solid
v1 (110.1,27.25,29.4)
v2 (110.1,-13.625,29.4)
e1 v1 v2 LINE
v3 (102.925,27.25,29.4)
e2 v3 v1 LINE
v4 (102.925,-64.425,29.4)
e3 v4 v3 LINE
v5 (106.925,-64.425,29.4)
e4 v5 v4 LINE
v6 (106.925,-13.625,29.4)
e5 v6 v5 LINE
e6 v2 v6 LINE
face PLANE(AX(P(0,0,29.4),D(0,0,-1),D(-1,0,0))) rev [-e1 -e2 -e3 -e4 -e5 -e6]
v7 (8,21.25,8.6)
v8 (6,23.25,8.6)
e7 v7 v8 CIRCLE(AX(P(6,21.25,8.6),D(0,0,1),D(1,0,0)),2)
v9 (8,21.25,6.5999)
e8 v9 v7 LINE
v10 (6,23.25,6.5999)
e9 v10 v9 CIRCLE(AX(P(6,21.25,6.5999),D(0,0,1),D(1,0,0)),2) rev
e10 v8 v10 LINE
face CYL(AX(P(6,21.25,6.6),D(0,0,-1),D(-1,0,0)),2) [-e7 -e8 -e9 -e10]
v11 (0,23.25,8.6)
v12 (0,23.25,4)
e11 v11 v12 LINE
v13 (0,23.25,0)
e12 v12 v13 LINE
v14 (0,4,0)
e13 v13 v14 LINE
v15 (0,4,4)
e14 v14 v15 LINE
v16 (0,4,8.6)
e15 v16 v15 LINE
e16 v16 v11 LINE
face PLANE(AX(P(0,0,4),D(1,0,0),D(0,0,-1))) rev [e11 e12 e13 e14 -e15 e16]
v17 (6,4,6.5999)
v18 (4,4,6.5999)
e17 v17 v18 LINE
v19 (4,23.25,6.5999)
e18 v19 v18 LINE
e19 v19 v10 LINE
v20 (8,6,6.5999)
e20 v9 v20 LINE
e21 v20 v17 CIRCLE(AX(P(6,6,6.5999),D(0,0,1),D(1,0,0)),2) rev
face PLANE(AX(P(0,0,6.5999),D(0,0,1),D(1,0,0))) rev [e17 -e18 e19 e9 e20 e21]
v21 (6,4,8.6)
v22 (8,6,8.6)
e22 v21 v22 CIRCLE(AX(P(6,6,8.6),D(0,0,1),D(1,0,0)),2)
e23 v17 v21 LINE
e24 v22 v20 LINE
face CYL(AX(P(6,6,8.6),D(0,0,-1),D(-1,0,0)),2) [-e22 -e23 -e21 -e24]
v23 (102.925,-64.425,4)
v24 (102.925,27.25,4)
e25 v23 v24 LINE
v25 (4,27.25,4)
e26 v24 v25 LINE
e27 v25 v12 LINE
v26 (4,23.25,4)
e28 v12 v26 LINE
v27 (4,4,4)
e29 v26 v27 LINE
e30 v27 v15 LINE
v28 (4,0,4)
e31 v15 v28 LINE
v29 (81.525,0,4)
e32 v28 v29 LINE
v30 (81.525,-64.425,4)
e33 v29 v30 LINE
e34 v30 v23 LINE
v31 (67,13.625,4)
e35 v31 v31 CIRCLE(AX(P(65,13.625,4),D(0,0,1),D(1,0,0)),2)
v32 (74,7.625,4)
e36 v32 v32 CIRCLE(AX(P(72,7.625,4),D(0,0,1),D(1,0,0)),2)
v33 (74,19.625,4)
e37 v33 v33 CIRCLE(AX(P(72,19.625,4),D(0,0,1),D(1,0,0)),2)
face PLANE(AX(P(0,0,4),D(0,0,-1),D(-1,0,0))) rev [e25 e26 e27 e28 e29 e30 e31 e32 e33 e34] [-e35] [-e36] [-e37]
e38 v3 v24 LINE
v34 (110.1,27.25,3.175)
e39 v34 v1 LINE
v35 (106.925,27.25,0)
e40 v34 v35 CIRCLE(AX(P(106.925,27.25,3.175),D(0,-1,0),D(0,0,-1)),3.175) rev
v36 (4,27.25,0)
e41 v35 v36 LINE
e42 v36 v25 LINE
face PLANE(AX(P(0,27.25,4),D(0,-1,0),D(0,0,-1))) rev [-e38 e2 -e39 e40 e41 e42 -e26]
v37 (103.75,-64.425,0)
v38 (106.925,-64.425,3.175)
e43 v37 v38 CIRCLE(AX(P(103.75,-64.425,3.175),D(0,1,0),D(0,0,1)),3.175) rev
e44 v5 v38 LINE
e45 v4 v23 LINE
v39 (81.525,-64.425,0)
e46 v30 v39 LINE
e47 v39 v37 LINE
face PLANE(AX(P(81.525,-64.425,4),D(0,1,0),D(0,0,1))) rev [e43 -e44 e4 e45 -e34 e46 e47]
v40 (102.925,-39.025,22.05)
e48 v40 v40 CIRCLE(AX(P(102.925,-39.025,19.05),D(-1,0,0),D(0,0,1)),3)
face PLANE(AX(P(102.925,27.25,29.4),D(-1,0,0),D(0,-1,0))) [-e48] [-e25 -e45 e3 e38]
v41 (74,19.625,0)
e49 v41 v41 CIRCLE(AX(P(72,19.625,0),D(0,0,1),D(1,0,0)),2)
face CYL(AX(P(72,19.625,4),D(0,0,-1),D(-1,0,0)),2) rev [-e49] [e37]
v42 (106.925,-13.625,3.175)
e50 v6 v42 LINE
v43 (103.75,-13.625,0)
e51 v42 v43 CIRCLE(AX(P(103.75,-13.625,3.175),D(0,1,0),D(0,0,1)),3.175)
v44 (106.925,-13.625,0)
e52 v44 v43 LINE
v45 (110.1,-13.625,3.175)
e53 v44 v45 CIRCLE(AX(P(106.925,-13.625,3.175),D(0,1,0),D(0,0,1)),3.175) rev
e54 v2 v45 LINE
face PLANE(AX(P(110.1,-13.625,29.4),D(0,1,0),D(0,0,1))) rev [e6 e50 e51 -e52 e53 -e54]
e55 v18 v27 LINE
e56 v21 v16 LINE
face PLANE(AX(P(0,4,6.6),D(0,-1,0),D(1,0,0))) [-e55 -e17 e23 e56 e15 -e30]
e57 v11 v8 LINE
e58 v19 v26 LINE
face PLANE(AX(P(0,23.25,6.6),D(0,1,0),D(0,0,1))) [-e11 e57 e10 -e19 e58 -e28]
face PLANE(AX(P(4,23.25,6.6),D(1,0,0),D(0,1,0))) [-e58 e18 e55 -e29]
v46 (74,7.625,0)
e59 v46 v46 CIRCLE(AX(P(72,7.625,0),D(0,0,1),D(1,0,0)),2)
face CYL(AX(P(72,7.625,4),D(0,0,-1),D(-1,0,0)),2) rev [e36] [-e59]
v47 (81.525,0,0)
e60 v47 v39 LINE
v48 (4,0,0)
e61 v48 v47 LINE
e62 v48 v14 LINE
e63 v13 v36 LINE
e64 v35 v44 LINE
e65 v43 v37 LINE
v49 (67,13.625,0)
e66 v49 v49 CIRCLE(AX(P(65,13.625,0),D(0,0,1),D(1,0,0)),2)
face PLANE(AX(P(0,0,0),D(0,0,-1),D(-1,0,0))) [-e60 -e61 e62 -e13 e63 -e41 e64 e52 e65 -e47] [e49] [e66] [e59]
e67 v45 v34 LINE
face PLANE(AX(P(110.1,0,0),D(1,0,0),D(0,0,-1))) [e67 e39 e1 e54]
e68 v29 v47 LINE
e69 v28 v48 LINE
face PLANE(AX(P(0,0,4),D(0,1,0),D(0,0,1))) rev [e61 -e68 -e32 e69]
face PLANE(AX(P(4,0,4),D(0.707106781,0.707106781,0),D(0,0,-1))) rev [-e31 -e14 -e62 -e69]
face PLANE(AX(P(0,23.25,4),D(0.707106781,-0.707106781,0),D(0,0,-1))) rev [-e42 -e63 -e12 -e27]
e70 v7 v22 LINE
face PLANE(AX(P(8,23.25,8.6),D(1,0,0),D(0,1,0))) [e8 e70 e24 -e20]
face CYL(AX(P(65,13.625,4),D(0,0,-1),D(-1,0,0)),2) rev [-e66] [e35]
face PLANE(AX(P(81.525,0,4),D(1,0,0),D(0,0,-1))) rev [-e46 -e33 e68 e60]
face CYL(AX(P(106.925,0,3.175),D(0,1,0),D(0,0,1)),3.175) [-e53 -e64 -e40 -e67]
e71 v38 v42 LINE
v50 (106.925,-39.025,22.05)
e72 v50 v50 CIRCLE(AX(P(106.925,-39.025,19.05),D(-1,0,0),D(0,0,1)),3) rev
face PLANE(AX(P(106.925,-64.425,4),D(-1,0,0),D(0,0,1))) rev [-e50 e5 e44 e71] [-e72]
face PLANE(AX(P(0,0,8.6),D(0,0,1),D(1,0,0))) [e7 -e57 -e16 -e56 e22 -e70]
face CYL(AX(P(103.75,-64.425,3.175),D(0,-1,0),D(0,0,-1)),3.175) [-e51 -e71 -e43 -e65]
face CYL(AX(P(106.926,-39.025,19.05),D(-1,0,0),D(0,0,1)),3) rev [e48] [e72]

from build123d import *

# Parameters (mm, degrees)
SKETCH1_R                      = 2
PROFILEBOSS_EXTRUDE1_DEPTH     = 4
CORNERBOSS_EXTRUDE2_DEPTH      = 0.0001
CORNERBOSS_EXTRUDE2_DEPTH_BACK = 25.4
SKETCH2_W                      = 4
SKETCH2_H                      = 91.675
BOSS_EXTRUDE3_DEPTH            = 0.0001
BOSS_EXTRUDE3_DEPTH_BACK       = 2.6
SKETCH3_W                      = 4
SKETCH3_H                      = 19.25
BOSS_EXTRUDE4_DEPTH            = 0.0001
BOSS_EXTRUDE4_DEPTH_BACK       = 2
SKETCH5_W                      = 8
SKETCH5_H                      = 19.25
FILLET1_R                      = 2
CHAMFER1_SIZE                  = 4
VSMOUNTHOLECUT_EXTRUDE1_REACH  = 126.934
SKETCH6_R                      = 3
SKETCH7_W                      = 29.4
SKETCH7_H                      = 40.875
THICKSIDEBOSS_EXTRUDE5_DEPTH   = 3.175
FILLET3_R                      = 3.175


with BuildPart() as part:
    # Sketch1 → ProfileBoss-Extrude1 (new body)
    with BuildSketch(Plane.XY):
        Polygon((0, 0), (81.525, 0), (81.525, -64.425), (106.925, -64.425), (106.925, 27.25), (0, 27.25), align=None)
        with Locations((72, 19.625)):
            Circle(SKETCH1_R, mode=Mode.SUBTRACT)
        with Locations((72, 7.625)):
            Circle(SKETCH1_R, mode=Mode.SUBTRACT)
        with Locations((65, 13.625)):
            Circle(SKETCH1_R, mode=Mode.SUBTRACT)
    extrude(amount=PROFILEBOSS_EXTRUDE1_DEPTH)

    # Sketch2 → CornerBoss-Extrude2 (add, two sides: drawn at the far end of the back side and taken through both)
    with BuildSketch(Plane(origin=(0, 0, 4), x_dir=(-1, 0, 0), z_dir=(0, 0, -1)).offset(-CORNERBOSS_EXTRUDE2_DEPTH_BACK)):
        with Locations((-104.925, -18.5875)):
            Rectangle(SKETCH2_W, SKETCH2_H)
    extrude(amount=CORNERBOSS_EXTRUDE2_DEPTH + CORNERBOSS_EXTRUDE2_DEPTH_BACK)

    # Sketch3 → Boss-Extrude3 (add, two sides: drawn at the far end of the back side and taken through both)
    with BuildSketch(Plane(origin=(0, 0, 4), x_dir=(-1, 0, 0), z_dir=(0, 0, -1)).offset(-BOSS_EXTRUDE3_DEPTH_BACK)):
        with Locations((-2, 13.625)):
            Rectangle(SKETCH3_W, SKETCH3_H)
    extrude(amount=BOSS_EXTRUDE3_DEPTH + BOSS_EXTRUDE3_DEPTH_BACK)

    # Sketch5 → Boss-Extrude4 (add, two sides: drawn at the far end of the back side and taken through both)
    with BuildSketch(Plane(origin=(0, 0, 6.6), x_dir=(-1, 0, 0), z_dir=(0, 0, -1)).offset(-BOSS_EXTRUDE4_DEPTH_BACK)):
        with Locations((-4, 13.625)):
            Rectangle(SKETCH5_W, SKETCH5_H)
    extrude(amount=BOSS_EXTRUDE4_DEPTH + BOSS_EXTRUDE4_DEPTH_BACK)

    # Fillet1
    fillet1_edges = [part.edges().sort_by_distance(p)[0] for p in [
        (8, 4, 7.59995),
        (8, 23.25, 7.59995),
    ]]
    fillet(fillet1_edges, radius=FILLET1_R)

    # Chamfer1
    chamfer1_edges = [part.edges().sort_by_distance(p)[0] for p in [
        (0, 27.25, 2),
        (0, 0, 2),
    ]]
    chamfer(chamfer1_edges, length=CHAMFER1_SIZE)

    # Sketch6 → VSMountHoleCut-Extrude1 (cut, up to next)
    with BuildSketch(Plane.ZY.offset(-102.925), mode=Mode.PRIVATE) as vsmountholecut_extrude1_sk1:
        with Locations((19.05, -39.025)):
            Circle(SKETCH6_R)
    vsmountholecut_extrude1_tool1 = extrude(vsmountholecut_extrude1_sk1.sketch, amount=-VSMOUNTHOLECUT_EXTRUDE1_REACH, mode=Mode.PRIVATE) & part.part
    add(vsmountholecut_extrude1_tool1.solids().sort_by_distance((102.925, -39.025, 19.05))[0], mode=Mode.SUBTRACT)

    # Sketch7 → ThickSideBoss-Extrude5 (add)
    with BuildSketch(Plane(origin=(106.925, 0, 0), x_dir=(0, 0, -1), z_dir=(1, 0, 0))):
        with Locations((-14.7, 6.8125)):
            Rectangle(SKETCH7_W, SKETCH7_H)
    extrude(amount=THICKSIDEBOSS_EXTRUDE5_DEPTH)

    # Fillet3
    fillet3_edges = [part.edges().sort_by_distance(p)[0] for p in [
        (106.925, -39.025, 0),
        (110.1, 6.8125, 0),
    ]]
    fillet(fillet3_edges, radius=FILLET3_R - 0.0001)  # a hair under: the kernel refuses the full size


solid = part.part
